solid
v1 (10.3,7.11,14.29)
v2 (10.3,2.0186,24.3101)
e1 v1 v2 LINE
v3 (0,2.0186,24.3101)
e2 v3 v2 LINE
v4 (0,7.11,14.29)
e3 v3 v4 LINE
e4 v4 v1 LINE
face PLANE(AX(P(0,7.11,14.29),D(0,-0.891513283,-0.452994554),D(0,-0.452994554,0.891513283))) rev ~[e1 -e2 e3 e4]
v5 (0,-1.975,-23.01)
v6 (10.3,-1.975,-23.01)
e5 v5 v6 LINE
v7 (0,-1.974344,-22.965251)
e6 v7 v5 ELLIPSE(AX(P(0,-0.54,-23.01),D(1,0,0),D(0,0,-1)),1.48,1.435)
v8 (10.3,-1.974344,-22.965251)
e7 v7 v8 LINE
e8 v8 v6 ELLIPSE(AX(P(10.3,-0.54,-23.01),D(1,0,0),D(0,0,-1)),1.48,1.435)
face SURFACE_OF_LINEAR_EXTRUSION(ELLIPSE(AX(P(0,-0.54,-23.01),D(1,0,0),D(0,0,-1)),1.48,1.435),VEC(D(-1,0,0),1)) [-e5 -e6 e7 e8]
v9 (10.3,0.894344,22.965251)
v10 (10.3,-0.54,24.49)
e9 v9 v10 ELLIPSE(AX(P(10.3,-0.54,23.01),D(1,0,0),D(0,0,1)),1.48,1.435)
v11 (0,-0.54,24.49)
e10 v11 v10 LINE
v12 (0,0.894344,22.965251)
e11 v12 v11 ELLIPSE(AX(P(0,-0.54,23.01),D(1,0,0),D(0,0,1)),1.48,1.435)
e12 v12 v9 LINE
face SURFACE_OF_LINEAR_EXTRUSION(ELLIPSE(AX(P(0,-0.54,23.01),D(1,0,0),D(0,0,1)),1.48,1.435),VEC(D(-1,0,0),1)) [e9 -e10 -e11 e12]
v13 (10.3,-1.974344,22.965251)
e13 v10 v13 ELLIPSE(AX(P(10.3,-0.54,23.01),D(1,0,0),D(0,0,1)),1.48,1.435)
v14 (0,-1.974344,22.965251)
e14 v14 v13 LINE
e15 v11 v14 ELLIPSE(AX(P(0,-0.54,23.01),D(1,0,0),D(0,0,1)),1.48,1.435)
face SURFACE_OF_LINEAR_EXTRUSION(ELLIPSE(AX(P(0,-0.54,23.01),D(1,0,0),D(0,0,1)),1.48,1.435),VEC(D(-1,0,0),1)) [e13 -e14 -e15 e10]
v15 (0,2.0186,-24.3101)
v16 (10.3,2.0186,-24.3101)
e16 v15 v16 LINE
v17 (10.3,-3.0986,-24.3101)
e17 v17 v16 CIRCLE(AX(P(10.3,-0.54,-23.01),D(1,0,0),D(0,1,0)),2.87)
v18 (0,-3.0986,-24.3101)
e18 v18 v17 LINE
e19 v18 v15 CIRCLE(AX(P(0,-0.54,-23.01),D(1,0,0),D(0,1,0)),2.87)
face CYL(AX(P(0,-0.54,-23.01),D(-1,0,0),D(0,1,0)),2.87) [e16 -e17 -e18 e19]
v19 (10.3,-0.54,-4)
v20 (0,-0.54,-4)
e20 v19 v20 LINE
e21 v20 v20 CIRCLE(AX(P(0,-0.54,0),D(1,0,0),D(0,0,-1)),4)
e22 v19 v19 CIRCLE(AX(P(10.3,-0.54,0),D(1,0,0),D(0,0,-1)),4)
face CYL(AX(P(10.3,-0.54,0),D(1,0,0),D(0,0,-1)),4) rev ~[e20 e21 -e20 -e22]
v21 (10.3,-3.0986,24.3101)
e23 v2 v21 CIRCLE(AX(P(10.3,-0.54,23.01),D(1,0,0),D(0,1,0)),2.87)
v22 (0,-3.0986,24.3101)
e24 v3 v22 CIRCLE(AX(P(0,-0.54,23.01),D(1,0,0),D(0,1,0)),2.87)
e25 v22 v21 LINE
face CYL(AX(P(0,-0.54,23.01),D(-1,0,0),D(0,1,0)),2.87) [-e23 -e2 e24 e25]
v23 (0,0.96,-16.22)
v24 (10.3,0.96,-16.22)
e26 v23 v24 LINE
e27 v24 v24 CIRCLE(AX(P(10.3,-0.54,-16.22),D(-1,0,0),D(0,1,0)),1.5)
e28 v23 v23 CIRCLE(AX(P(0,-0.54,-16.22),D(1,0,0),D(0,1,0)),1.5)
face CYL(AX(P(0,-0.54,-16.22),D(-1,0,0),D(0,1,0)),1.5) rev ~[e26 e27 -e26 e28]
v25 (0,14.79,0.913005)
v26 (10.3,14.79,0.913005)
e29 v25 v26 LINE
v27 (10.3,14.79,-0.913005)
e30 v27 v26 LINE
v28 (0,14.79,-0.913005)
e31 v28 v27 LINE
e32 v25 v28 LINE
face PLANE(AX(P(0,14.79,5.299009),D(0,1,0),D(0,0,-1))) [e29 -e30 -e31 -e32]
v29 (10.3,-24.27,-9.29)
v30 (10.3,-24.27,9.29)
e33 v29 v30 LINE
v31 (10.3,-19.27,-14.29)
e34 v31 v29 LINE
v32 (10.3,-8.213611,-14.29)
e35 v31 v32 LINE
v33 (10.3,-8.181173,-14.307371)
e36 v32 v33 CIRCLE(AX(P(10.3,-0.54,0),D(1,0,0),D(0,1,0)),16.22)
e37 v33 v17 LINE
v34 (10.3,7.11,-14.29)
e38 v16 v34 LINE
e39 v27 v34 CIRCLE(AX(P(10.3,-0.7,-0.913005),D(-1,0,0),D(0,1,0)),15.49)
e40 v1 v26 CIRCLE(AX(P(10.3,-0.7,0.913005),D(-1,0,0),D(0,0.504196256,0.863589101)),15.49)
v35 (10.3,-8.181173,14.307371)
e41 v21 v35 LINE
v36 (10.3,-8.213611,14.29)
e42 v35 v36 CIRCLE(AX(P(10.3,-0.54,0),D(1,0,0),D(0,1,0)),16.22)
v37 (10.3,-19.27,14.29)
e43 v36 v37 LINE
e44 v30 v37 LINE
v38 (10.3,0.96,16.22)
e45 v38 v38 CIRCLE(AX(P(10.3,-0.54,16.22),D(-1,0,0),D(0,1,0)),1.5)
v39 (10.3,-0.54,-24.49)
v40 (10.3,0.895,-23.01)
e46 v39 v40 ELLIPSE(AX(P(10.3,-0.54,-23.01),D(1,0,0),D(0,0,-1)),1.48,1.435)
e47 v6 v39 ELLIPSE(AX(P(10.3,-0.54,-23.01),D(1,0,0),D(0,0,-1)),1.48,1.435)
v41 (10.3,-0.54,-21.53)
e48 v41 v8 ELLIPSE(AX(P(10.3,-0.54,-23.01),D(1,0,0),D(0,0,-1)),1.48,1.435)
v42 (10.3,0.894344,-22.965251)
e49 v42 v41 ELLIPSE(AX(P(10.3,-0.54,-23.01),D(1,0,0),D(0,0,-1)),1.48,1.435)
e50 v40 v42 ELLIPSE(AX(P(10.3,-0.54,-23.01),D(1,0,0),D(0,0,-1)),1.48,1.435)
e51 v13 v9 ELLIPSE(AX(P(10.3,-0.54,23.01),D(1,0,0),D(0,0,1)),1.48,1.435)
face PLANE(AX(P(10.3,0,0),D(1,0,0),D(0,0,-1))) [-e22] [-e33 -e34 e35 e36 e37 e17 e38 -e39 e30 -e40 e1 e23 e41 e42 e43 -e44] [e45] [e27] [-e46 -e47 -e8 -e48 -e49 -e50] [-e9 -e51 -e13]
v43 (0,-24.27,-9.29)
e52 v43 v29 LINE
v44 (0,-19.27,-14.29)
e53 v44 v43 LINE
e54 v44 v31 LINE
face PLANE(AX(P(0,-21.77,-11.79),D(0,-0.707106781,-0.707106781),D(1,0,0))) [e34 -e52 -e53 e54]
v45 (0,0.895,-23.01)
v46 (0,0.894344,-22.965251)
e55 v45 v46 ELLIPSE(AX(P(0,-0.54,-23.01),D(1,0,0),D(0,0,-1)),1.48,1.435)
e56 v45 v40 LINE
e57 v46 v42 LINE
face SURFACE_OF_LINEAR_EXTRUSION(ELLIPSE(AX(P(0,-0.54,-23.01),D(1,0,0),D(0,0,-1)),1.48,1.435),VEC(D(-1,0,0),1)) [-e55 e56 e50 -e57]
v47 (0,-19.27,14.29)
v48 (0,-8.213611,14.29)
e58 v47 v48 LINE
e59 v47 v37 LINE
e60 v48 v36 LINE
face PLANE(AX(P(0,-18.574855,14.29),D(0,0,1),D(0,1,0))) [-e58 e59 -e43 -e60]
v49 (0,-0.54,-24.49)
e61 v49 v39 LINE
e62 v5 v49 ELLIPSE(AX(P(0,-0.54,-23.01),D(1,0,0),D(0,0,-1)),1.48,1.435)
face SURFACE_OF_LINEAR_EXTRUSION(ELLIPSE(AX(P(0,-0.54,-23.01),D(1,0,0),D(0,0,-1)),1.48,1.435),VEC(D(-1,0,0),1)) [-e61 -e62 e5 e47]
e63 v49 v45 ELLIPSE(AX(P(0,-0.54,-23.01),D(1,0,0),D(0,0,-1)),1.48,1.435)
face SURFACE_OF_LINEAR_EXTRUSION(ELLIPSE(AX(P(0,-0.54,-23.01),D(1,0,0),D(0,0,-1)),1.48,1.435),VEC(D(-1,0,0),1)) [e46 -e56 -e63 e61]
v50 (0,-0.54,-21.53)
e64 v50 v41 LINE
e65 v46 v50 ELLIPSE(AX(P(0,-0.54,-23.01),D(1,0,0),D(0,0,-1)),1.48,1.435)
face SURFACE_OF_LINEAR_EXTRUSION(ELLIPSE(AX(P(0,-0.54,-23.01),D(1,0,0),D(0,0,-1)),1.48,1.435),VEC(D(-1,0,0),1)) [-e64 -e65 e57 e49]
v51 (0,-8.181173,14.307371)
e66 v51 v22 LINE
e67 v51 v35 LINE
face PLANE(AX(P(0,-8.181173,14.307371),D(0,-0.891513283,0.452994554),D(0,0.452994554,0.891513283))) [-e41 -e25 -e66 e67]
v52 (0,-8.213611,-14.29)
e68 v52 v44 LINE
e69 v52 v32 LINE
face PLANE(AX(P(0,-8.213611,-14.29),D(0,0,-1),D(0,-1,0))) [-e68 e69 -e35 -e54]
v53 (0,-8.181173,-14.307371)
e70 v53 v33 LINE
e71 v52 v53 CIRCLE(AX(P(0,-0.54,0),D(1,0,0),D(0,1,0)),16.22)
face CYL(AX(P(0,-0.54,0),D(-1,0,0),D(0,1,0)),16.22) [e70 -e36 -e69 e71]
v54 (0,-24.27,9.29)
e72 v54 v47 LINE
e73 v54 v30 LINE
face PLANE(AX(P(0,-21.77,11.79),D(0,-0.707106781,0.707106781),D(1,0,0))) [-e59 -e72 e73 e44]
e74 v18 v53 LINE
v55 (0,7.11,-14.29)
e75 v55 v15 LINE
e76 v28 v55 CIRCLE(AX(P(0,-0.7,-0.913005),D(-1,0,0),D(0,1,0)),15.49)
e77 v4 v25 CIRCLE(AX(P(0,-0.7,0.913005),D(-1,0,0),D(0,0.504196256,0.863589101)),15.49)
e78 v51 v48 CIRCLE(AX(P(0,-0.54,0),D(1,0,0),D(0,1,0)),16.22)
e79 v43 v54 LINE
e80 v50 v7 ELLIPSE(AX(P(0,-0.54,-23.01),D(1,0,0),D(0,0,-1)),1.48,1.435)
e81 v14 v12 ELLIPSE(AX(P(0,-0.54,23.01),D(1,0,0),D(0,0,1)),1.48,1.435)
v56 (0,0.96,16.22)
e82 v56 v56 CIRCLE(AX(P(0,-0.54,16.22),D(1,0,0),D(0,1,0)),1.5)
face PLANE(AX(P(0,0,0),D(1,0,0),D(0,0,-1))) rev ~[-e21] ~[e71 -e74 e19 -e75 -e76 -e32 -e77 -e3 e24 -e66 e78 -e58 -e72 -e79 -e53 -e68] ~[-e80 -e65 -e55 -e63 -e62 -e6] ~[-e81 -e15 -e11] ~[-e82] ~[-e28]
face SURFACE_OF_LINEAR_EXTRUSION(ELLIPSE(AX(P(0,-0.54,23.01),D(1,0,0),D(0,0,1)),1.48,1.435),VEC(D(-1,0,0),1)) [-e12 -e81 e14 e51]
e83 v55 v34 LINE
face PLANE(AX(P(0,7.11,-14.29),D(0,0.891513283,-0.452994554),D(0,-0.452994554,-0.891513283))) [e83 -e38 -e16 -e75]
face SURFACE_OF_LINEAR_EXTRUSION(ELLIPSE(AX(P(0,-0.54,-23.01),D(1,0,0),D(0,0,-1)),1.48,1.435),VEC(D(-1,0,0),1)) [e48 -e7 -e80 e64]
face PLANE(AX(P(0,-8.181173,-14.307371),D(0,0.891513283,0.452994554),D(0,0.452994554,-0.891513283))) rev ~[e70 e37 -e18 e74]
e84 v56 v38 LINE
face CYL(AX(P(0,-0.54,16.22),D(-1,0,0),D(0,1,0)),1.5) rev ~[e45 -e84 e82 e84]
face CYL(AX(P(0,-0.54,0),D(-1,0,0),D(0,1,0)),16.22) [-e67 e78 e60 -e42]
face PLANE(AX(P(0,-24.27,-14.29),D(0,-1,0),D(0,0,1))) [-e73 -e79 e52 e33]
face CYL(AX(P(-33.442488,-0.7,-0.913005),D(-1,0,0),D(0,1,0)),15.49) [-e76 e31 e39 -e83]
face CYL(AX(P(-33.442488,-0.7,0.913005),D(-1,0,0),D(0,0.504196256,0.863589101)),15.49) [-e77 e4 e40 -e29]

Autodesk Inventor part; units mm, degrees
ref_plane "YZ Plane" through (0, 0, 0) normal (1, 0, 0) x (0, 1, 0)
ref_plane "XZ Plane" through (0, 0, 0) normal (0, 1, 0) x (-1, 0, 0)
ref_plane "XY Plane" through (0, 0, 0) normal (0, 0, 1) x (1, 0, 0)
sketch "Sketch1" plane through (0, 0, 0) normal (1, 0, 0) x (0, 1, 0)
  line L0 (-0.54, 0) -> (-0.54, -14.29)
  circle A0 centre (-0.54, 0) radius 7.65
  line L1 (-0.54, -14.29) -> (14.79, -14.29)
  line L2 (14.79, -14.29) -> (-24.27, -14.29)
  line L3 (-24.27, -14.29) -> (-24.27, 14.29)
  line L4 (-24.27, 14.29) -> (14.79, 14.29)
  line L5 (14.79, 14.29) -> (14.79, -14.29)
  circle A1 centre (-0.54, 0) radius 16.22
  circle A2 centre (-0.54, 0) radius 23.01
  line L6 (-0.54, 0) -> (-0.54, -23.01)
  line L7 (-0.54, -23.01) -> (-0.54, -24.49)
  line L8 (-0.54, -23.01) -> (0.895, -23.01)
  ellipse E0 centre (-0.54, -23.01) end of major axis (-0.54, -24.49) minor radius 1.435
  circle A3 centre (-0.54, -16.22) radius 1.5
  line L9 (-8.19, 0) -> (-16.76, 0)
  line L10 (-8.19, 0) -> (-8.19, -14.29)
  line L11 (-0.54, -23.01) -> (-3.41, -23.01)
  circle A4 centre (-0.54, -23.01) radius 2.87
  line L12 (-8.19, -14.29) -> (-3.0986, -24.3101)
  line L13 (7.11, -14.29) -> (2.0186, -24.3101)
  ellipse E1 centre (-0.54, 23.01) end of major axis (-0.54, 24.49) minor radius 1.435
  circle A5 centre (-0.54, 16.22) radius 1.5
  circle A6 centre (-0.54, 23.01) radius 2.87
  line L14 (-8.19, 14.29) -> (-3.0986, 24.3101)
  line L15 (7.11, 14.29) -> (2.0186, 24.3101)
  point P0 (-3.4044, -22.831)
  point P1 (-1.9743, -22.9653)
  point P2 (-1.975, -23.01)
  point P3 (-8.1812, -14.3074)
  point P4 (-8.1812, 14.3074)
  point P5 (-8.2136, 14.29)
  point P6 (-8.2136, -14.29)
  dimension "d13" = 15.3
  dimension "d18" = 46.02
  dimension "d12" = 14.29
  dimension "d14" = 15.33
  dimension "d15" = 39.06
  dimension "d16" = 28.58
  dimension "d17" = 32.44
  dimension "d19" = 1.48
  dimension "d20" = 1.435
  dimension "d21" = 3
  dimension "d22" = 2.87
extrude "Extrusion1" add sketch "Sketch1" along normal blind 10.3 contours A0 L9 A1 L4 L5 L1 L0 | L0 L2 L10 A0 | L6 A3 A1 L12 L2 | L1 L13 A1 A3 L6 | L10 L2 A1 L9 | L12 A1 L2 | A1 L2 A2 L4 | A1 L5 L1 | L13 A2 A4 L6 A3 A1 | A1 A3 L6 A4 A2 L12 | A1 L14 L4 | L13 A4 A2 | L2 L3 L4 A2 | A2 A4 L12 | L14 A1 A5 L15 L4 | L14 A2 A6 L15 A1 A5 | A1 L4 L5 | A4 L11 E0 A2 | A2 E0 L6 A4 | A4 L6 E0 A2 | A2 E0 L11 A4 | L14 A6 A2 | A2 A6 L15 | A6 A2 E1 | A2 E1 A6
fillet "Fillet1" radius 15.49 2 edges at (5.15, 14.79, -14.29) (5.15, 14.79, 14.29)
chamfer "Chamfer1" distance 5 angle 45 2 edges at (5.15, -24.27, -14.29) (5.15, -24.27, 14.29)
sketch "Sketch2" plane through (10.3, 0, 0) normal (1, 0, 0) x (0, 0, -1)
  circle A0 centre (0, -0.54) radius 7.65 projected
  line L0 (0, -0.54) -> (7.65, -0.54)
  circle A1 centre (0, -0.54) radius 4
  circle A2 centre (0, -0.54) radius 7.65
  point P0 (0, 0)
  dimension "d29" = 8
extrude "8mm_inlet" add sketch "Sketch2" against normal up to surface (10.3 mm away)
properties part number "AMT102-0512-I5000-5"
